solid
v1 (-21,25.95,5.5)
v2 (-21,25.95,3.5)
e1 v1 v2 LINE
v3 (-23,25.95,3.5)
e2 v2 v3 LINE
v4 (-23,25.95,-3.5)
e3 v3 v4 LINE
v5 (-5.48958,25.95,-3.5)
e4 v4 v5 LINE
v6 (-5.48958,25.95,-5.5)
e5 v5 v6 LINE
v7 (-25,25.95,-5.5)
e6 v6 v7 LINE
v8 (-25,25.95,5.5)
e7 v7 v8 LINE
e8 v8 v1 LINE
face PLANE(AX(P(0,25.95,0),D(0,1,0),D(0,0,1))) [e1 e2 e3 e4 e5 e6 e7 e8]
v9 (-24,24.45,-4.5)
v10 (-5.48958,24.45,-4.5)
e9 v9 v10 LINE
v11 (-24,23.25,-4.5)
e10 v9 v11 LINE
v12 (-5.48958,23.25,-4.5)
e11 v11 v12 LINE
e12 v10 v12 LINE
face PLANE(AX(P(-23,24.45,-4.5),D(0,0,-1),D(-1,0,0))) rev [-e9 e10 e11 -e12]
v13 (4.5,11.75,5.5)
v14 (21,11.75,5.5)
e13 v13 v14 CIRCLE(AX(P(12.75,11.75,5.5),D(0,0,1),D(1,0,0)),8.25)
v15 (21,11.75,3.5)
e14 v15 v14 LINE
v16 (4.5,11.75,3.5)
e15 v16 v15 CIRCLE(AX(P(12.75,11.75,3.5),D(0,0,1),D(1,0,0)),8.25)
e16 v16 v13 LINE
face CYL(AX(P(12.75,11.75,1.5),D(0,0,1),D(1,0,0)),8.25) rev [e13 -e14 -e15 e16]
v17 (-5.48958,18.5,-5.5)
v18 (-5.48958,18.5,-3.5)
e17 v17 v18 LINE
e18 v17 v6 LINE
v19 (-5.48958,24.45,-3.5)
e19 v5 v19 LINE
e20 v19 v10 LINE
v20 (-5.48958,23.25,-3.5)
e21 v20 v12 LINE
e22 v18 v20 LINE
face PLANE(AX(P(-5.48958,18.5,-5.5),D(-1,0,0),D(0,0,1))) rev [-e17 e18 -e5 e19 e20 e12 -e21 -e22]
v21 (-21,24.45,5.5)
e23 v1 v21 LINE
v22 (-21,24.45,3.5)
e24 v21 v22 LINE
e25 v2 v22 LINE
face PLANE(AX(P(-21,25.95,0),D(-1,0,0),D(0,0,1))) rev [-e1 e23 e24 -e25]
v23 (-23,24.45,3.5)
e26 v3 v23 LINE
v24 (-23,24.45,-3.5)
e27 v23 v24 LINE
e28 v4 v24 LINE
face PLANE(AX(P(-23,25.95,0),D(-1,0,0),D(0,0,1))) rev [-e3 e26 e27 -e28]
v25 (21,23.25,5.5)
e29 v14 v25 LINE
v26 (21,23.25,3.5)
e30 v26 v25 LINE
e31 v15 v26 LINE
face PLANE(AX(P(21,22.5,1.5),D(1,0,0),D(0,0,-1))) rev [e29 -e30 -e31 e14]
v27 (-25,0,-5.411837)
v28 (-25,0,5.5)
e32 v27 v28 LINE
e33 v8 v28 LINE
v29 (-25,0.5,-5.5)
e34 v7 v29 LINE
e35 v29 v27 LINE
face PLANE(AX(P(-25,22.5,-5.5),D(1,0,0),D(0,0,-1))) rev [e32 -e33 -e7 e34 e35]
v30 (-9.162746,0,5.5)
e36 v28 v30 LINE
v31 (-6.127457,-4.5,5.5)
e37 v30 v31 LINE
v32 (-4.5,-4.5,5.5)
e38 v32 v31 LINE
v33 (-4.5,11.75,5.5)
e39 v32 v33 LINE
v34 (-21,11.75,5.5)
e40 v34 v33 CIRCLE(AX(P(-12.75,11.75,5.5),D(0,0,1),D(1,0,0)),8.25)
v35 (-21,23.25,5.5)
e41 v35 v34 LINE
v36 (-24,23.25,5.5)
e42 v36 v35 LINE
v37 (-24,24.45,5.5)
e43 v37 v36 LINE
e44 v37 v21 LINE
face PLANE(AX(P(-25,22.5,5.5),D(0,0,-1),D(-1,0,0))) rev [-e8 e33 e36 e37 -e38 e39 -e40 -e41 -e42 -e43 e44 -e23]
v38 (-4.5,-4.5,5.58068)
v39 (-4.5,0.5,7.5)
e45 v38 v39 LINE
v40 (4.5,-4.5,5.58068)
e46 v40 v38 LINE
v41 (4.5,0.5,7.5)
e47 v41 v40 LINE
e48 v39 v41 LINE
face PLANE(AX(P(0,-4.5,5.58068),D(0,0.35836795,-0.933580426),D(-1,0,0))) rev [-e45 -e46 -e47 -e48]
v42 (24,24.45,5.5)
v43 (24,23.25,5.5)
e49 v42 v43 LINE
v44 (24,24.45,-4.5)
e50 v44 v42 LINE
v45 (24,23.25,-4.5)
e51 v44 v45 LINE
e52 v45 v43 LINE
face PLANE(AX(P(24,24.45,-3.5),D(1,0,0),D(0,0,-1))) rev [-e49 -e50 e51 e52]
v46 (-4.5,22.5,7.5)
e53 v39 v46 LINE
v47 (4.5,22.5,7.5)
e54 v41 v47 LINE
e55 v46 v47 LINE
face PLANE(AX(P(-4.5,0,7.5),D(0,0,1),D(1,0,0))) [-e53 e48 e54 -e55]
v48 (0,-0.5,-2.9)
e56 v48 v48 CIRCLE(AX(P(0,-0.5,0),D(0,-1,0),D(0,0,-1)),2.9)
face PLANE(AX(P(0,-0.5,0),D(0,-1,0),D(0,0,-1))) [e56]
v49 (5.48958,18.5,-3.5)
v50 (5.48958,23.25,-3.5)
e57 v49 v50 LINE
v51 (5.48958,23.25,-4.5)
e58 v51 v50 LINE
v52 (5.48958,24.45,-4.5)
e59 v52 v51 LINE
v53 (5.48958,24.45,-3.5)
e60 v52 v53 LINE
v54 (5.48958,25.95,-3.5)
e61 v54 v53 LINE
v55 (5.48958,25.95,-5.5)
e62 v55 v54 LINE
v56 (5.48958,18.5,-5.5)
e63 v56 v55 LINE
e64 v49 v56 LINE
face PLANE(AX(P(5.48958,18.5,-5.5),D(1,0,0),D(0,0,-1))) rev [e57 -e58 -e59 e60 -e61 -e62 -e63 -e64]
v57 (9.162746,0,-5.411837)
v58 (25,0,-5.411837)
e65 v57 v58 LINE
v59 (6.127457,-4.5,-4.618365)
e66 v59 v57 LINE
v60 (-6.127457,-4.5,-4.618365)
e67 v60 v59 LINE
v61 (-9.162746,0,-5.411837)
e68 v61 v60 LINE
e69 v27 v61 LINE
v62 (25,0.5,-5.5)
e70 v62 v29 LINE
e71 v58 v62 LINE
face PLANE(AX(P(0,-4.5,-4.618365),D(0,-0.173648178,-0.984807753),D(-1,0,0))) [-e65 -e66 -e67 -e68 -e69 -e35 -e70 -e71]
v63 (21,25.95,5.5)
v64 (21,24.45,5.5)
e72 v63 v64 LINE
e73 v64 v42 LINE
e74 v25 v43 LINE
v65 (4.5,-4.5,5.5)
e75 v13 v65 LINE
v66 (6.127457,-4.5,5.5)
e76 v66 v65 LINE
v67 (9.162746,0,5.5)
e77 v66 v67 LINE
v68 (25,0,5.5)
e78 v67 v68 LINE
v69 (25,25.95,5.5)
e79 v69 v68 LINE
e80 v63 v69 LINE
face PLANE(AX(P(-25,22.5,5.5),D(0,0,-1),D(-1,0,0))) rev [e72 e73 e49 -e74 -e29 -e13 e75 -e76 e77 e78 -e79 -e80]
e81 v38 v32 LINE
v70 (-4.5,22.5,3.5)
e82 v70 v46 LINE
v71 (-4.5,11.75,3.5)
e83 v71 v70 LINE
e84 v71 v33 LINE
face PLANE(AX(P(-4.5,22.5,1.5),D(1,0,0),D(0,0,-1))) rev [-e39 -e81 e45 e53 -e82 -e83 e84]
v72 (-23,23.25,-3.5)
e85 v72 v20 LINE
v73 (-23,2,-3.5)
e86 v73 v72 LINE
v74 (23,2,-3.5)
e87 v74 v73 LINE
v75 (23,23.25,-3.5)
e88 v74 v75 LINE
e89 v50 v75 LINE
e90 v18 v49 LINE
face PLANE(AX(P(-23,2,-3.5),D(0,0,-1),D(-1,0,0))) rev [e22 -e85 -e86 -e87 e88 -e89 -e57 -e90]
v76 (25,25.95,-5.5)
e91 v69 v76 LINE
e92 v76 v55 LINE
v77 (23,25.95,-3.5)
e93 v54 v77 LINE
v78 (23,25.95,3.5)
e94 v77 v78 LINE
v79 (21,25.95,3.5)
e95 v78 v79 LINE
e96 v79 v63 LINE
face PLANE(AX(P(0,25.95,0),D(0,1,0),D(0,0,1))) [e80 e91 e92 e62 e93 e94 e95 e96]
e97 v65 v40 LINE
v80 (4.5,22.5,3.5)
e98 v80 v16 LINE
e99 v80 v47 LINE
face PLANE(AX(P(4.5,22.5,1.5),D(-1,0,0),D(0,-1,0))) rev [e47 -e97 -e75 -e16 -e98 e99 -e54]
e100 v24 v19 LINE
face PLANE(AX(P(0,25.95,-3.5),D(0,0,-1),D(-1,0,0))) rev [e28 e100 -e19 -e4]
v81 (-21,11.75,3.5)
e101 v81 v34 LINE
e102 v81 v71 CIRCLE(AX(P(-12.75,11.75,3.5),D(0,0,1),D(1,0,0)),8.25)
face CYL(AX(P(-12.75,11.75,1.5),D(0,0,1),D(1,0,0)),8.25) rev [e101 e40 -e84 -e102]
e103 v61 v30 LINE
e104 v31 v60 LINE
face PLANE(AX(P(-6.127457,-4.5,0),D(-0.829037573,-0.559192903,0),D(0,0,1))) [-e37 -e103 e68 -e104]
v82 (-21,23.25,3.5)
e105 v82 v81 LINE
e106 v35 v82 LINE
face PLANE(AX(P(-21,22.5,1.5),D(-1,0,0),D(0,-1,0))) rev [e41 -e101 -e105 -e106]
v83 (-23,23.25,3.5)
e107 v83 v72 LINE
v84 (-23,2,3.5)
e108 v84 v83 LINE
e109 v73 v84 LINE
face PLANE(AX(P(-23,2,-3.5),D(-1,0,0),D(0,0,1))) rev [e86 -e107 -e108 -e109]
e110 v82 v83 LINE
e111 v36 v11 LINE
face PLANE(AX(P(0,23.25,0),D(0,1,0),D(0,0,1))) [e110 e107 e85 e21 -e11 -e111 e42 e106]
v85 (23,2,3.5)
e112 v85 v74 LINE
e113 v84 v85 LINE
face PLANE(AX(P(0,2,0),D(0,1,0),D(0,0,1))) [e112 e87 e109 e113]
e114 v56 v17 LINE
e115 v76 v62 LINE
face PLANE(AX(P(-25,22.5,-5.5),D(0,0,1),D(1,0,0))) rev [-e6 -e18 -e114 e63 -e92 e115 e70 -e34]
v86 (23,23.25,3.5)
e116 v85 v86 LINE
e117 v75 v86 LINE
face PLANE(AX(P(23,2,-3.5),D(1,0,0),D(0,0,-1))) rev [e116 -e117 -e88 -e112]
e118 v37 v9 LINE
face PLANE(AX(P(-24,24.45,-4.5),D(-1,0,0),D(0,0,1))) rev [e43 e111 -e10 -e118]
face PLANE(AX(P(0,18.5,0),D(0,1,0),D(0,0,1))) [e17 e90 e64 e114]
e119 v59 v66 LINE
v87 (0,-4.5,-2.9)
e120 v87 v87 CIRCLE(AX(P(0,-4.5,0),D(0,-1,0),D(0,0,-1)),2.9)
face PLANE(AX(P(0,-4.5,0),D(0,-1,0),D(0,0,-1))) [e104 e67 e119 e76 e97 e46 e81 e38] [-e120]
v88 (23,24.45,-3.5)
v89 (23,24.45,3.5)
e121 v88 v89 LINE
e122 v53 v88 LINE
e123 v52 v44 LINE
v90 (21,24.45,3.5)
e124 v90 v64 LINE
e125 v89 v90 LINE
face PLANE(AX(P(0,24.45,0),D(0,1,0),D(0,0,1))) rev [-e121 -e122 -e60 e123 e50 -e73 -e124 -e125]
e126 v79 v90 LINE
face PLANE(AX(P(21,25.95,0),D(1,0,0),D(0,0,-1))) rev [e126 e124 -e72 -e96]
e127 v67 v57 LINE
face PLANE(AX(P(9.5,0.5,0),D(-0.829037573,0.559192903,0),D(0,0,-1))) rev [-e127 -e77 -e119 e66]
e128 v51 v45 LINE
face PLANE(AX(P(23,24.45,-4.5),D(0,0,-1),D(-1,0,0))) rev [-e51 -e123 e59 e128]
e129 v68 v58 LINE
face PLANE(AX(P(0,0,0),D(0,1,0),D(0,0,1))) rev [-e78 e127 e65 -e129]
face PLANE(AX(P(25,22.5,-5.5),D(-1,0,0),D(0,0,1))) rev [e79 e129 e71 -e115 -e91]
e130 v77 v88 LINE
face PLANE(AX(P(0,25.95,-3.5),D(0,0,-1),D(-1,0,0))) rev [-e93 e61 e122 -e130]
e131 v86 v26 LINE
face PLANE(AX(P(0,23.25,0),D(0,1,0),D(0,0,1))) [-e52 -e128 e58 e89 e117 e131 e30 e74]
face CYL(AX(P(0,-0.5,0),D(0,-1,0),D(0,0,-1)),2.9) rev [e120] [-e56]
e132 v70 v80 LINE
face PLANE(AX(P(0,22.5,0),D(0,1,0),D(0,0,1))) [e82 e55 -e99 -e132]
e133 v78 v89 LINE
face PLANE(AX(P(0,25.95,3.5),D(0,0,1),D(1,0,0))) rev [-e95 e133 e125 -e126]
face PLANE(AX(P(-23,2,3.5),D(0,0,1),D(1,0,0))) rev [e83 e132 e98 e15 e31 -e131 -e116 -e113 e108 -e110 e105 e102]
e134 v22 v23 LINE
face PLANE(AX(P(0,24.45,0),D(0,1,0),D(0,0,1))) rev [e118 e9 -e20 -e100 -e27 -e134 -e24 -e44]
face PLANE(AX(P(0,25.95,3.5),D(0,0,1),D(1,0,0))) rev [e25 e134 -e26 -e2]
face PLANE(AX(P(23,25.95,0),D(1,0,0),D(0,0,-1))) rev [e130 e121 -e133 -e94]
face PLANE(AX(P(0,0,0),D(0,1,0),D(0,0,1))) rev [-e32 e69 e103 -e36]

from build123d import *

# Parameters (mm, degrees)
ESBO_O1_W                 = 50
ESBO_O1_H                 = 11
RESSALTO_EXTRUS_O1_DEPTH  = 22.5
ESBO_O2_W                 = 46
ESBO_O2_H                 = 7
CORTE_EXTRUS_O1_DEPTH     = 20.5
ESBO_O3_W                 = 10.97916057
ESBO_O3_H                 = 2
CORTE_EXTRUS_O2_DEPTH     = 4
CORTE_EXTRUS_O3_DEPTH     = 4
ESBO_O9_W                 = 50
ESBO_O9_H                 = 4
RESSALTO_EXTRUS_O4_DEPTH  = 7
ESBO_O13_R                = 1.5
CORTE_EXTRUS_O4_DEPTH     = 7
ESBO_O19_W                = 9
ESBO_O19_H                = 4
RESSALTO_EXTRUS_O5_DEPTH  = 22.5
ESBO_O20_W                = 50
ESBO_O20_H                = 4
CORTE_EXTRUS_O5_DEPTH     = 7
RESSALTO_EXTRUS_O6_DEPTH  = 0.75
RESSALTO_EXTRUS_O7_DEPTH  = 1.2
RESSALTO_EXTRUS_O8_DEPTH  = 1.5
RESSALTO_EXTRUS_O9_DEPTH  = 4.5
ESBO_O26_R                = 2.9
CORTE_EXTRUS_O6_DEPTH     = 4
ESBO_O28_W                = 7
ESBO_O28_H                = 7
RESSALTO_EXTRUS_O10_DEPTH = 4.5
CHANFRO1_SIZE             = 5
CHANFRO1_SIZE_2           = 3.372542584
CHANFRO2_SIZE             = 3.372542584
CHANFRO2_SIZE_2           = 5
CHANFRO3_SIZE             = 5
CHANFRO3_SIZE2            = 0.881634904
CHANFRO4_SIZE             = 5
CHANFRO4_SIZE2            = 1.919320175


with BuildPart() as part:
    # Esboço1 → Ressalto-extrusão1 (new body)
    with BuildSketch(Plane(origin=(0, 0, 0), x_dir=(1, 0, 0), z_dir=(0, 1, 0))):
        Rectangle(ESBO_O1_W, ESBO_O1_H)
    extrude(amount=RESSALTO_EXTRUS_O1_DEPTH)

    # Esboço2 → Corte-extrusão1 (cut)
    with BuildSketch(Plane(origin=(0, 22.5, 0), x_dir=(1, 0, 0), z_dir=(0, 1, 0))):
        Rectangle(ESBO_O2_W, ESBO_O2_H)
    extrude(amount=-CORTE_EXTRUS_O1_DEPTH, mode=Mode.SUBTRACT)

    # Esboço3 → Corte-extrusão2 (cut)
    with BuildSketch(Plane(origin=(0, 22.5, 0), x_dir=(1, 0, 0), z_dir=(0, 1, 0))):
        with Locations((0, 4.5)):
            Rectangle(ESBO_O3_W, ESBO_O3_H)
    extrude(amount=-CORTE_EXTRUS_O2_DEPTH, mode=Mode.SUBTRACT)

    # Esboço5 → Corte-extrusão3 (cut)
    with BuildSketch(Plane.XY.offset(5.5)):
        with BuildLine():
            Line((-21, 22.5), (-4.5, 22.5))
            Line((-4.5, 22.5), (-4.5, 11.75))
            ThreePointArc((-4.5, 11.75), (-12.75, 3.5), (-21, 11.75))
            Line((-21, 11.75), (-21, 22.5))
        make_face()
        with BuildLine():
            Line((4.5, 22.5), (21, 22.5))
            Line((21, 22.5), (21, 11.75))
            ThreePointArc((21, 11.75), (12.75, 3.5), (4.5, 11.75))
            Line((4.5, 11.75), (4.5, 22.5))
        make_face()
    extrude(amount=-CORTE_EXTRUS_O3_DEPTH, mode=Mode.SUBTRACT)

    # Esboço9 → Ressalto-extrusão4 (add)
    with BuildSketch(Plane(origin=(0, 0, -5.5), x_dir=(-1, 0, 0), z_dir=(0, 0, -1))):
        with Locations((0, 2)):
            Rectangle(ESBO_O9_W, ESBO_O9_H)
    extrude(amount=RESSALTO_EXTRUS_O4_DEPTH)

    # Esboço13 → Corte-extrusão4 (cut)
    with BuildSketch(Plane(origin=(0, 4, 0), x_dir=(1, 0, 0), z_dir=(0, 1, 0))):
        with Locations(Location((10, 9, 0), (0, 0, 270))):
            Circle(ESBO_O13_R)
        with Locations(Location((5, 9, 0), (0, 0, 270))):
            Circle(ESBO_O13_R)
        with Locations(Location((20, 9, 0), (0, 0, 270))):
            Circle(ESBO_O13_R)
        with Locations(Location((15, 9, 0), (0, 0, 270))):
            Circle(ESBO_O13_R)
        with Locations(Location((0, 9, 0), (0, 0, 270))):
            Circle(ESBO_O13_R)
        with Locations(Location((-5, 9, 0), (0, 0, 270))):
            Circle(ESBO_O13_R)
        with Locations(Location((-10, 9, 0), (0, 0, 270))):
            Circle(ESBO_O13_R)
        with Locations(Location((-15, 9, 0), (0, 0, 270))):
            Circle(ESBO_O13_R)
        with Locations(Location((-20, 9, 0), (0, 0, 270))):
            Circle(ESBO_O13_R)
    extrude(amount=-CORTE_EXTRUS_O4_DEPTH, mode=Mode.SUBTRACT)

    # Esboço19 → Ressalto-extrusão5 (add)
    with BuildSketch(Plane(origin=(0, 22.5, 0), x_dir=(1, 0, 0), z_dir=(0, 1, 0))):
        with Locations((0, -5.5)):
            Rectangle(ESBO_O19_W, ESBO_O19_H)
    extrude(amount=-RESSALTO_EXTRUS_O5_DEPTH)

    # Esboço20 → Corte-extrusão5 (cut)
    with BuildSketch(Plane(origin=(0, 0, -12.5), x_dir=(-1, 0, 0), z_dir=(0, 0, -1))):
        with Locations((0, 2)):
            Rectangle(ESBO_O20_W, ESBO_O20_H)
    extrude(amount=-CORTE_EXTRUS_O5_DEPTH, mode=Mode.SUBTRACT)

    # Esboço21 → Ressalto-extrusão6 (add)
    with BuildSketch(Plane(origin=(0, 22.5, 0), x_dir=(1, 0, 0), z_dir=(0, 1, 0))):
        Polygon((-21, -5.5), (-21, -3.5), (-23, -3.5), (-23, 3.5), (-5.489580285, 3.5), (-5.489580285, 5.5), (-25, 5.5), (-25, -5.5), align=None)
        Polygon((21, -3.5), (21, -5.5), (25, -5.5), (25, 5.5), (5.489580285, 5.5), (5.489580285, 3.5), (23, 3.5), (23, -3.5), align=None)
    extrude(amount=RESSALTO_EXTRUS_O6_DEPTH)

    # Esboço22 → Ressalto-extrusão7 (add)
    with BuildSketch(Plane(origin=(0, 23.25, 0), x_dir=(1, 0, 0), z_dir=(0, 1, 0))):
        Polygon((-24, 3.5), (-24, -5.5), (-25, -5.5), (-25, 5.5), (-5.489580285, 5.5), (-5.489580285, 4.5), (-23, 4.5), (-24, 4.5), align=None)
        Polygon((23, 4.5), (5.489580285, 4.5), (5.489580285, 5.5), (25, 5.5), (25, -5.5), (24, -5.5), (24, 3.5), (24, 4.5), align=None)
    extrude(amount=RESSALTO_EXTRUS_O7_DEPTH)

    # Esboço23 → Ressalto-extrusão8 (add)
    with BuildSketch(Plane(origin=(0, 24.45, 0), x_dir=(1, 0, 0), z_dir=(0, 1, 0))):
        Polygon((-24, 4.5), (-24, -5.5), (-25, -5.5), (-25, 5.5), (-5.489580285, 5.5), (-5.489580285, 4.5), align=None)
        Polygon((-23, 3.5), (-5.489580285, 3.5), (-5.489580285, 4.5), (-24, 4.5), (-24, -5.5), (-21, -5.5), (-21, -3.5), (-23, -3.5), align=None)
        Polygon((5.489580285, 5.5), (5.489580285, 4.5), (24, 4.5), (24, -5.5), (25, -5.5), (25, 5.5), align=None)
        Polygon((23, -3.5), (21, -3.5), (21, -5.5), (24, -5.5), (24, 4.5), (5.489580285, 4.5), (5.489580285, 3.5), (23, 3.5), align=None)
    extrude(amount=RESSALTO_EXTRUS_O8_DEPTH)

    # Esboço24 → Ressalto-extrusão9 (add)
    with BuildSketch(Plane.XZ):
        Polygon((0, 3.5), (-3.5, 3.5), (-3.5, 0), (-3.5, -3.5), (3.5, -3.5), (3.5, 3.5), align=None)
    extrude(amount=RESSALTO_EXTRUS_O9_DEPTH)

    # Esboço26 → Corte-extrusão6 (cut)
    with BuildSketch(Plane.XZ.offset(4.5)):
        with Locations(Location((0, 0, 0), (0, 0, 270))):
            Circle(ESBO_O26_R)
    extrude(amount=-CORTE_EXTRUS_O6_DEPTH, mode=Mode.SUBTRACT)

    # Esboço28 → Ressalto-extrusão10 (add)
    with BuildSketch(Plane.XZ):
        Polygon((-4.5, 5.5), (-9.5, 5.5), (-9.5, -5.5), (9.5, -5.5), (9.5, 5.5), (4.5, 5.5), (4.5, 7.5), (-4.5, 7.5), align=None)
        Rectangle(ESBO_O28_W, ESBO_O28_H, mode=Mode.SUBTRACT)
    extrude(amount=RESSALTO_EXTRUS_O10_DEPTH)

    # Chanfro1
    # the kernel refuses this chamfer: 5, 3.372542584 mm, written as the material it adds along each edge
    # the kernel refuses this chamfer: 5, 3.372542584 mm, written as the material it takes off along each edge
    with BuildSketch(Plane(origin=(-9.5, -4.5, 18.417545032), x_dir=(-0.021644705014774095, 0.9997657259302418, 0), z_dir=(0, 0, -1))) as chanfro1_2_piece_1_section:
        Polygon((CHANFRO1_SIZE * 0.99976572593, CHANFRO1_SIZE * 0.0216447050148), (-CHANFRO1_SIZE_2 * 0.0216447050161, CHANFRO1_SIZE_2 * 0.999765725993), (0, 0), align=None)
    chanfro1_2_piece_1 = extrude(amount=36.835090064, mode=Mode.PRIVATE)
    chanfro1_2_piece_1 = split(chanfro1_2_piece_1, bisect_by=Plane(origin=(-8.365599313, 0, 0), z_dir=(0, -1, 0)), keep=Keep.TOP, mode=Mode.PRIVATE)
    add(chanfro1_2_piece_1, mode=Mode.SUBTRACT)

    # Chanfro2
    # the kernel refuses this chamfer: 5, 3.372542584 mm, written as the material it takes off along each edge
    with BuildSketch(Plane(origin=(9.5, -4.5, -18.417545032), x_dir=(-0.9988697089125116, -0.04753214298802805, 0), z_dir=(0, 0, 1))) as chanfro2_piece_1_section:
        Polygon((CHANFRO2_SIZE * 0.998869708975, -CHANFRO2_SIZE * 0.047532142991), (-CHANFRO2_SIZE_2 * 0.047532142988, -CHANFRO2_SIZE_2 * 0.998869708913), (0, 0), align=None)
    chanfro2_piece_1 = extrude(amount=36.835090064, mode=Mode.PRIVATE)
    chanfro2_piece_1 = split(chanfro2_piece_1, bisect_by=Plane(origin=(8.383687283, 0, 0), z_dir=(0, -1, 0)), keep=Keep.TOP, mode=Mode.PRIVATE)
    add(chanfro2_piece_1, mode=Mode.SUBTRACT)

    # Chanfro3
    chanfro3_edges = [part.edges().sort_by_distance(p)[0] for p in [
        (0, -4.5, -5.5),
    ]]
    chanfro3_side = [part.faces().sort_by_distance(p)[0] for p in [
        (0, 11.578416309, -5.5),
    ]]
    chamfer(chanfro3_edges, length=CHANFRO3_SIZE, length2=CHANFRO3_SIZE2, reference=chanfro3_side[0])

    # Chanfro4
    chanfro4_edges = [part.edges().sort_by_distance(p)[0] for p in [
        (0, -4.5, 7.5),
    ]]
    chanfro4_side = [part.faces().sort_by_distance(p)[0] for p in [
        (0, 9, 7.5),
    ]]
    chamfer(chanfro4_edges, length=CHANFRO4_SIZE, length2=CHANFRO4_SIZE2, reference=chanfro4_side[0])


solid = part.part
